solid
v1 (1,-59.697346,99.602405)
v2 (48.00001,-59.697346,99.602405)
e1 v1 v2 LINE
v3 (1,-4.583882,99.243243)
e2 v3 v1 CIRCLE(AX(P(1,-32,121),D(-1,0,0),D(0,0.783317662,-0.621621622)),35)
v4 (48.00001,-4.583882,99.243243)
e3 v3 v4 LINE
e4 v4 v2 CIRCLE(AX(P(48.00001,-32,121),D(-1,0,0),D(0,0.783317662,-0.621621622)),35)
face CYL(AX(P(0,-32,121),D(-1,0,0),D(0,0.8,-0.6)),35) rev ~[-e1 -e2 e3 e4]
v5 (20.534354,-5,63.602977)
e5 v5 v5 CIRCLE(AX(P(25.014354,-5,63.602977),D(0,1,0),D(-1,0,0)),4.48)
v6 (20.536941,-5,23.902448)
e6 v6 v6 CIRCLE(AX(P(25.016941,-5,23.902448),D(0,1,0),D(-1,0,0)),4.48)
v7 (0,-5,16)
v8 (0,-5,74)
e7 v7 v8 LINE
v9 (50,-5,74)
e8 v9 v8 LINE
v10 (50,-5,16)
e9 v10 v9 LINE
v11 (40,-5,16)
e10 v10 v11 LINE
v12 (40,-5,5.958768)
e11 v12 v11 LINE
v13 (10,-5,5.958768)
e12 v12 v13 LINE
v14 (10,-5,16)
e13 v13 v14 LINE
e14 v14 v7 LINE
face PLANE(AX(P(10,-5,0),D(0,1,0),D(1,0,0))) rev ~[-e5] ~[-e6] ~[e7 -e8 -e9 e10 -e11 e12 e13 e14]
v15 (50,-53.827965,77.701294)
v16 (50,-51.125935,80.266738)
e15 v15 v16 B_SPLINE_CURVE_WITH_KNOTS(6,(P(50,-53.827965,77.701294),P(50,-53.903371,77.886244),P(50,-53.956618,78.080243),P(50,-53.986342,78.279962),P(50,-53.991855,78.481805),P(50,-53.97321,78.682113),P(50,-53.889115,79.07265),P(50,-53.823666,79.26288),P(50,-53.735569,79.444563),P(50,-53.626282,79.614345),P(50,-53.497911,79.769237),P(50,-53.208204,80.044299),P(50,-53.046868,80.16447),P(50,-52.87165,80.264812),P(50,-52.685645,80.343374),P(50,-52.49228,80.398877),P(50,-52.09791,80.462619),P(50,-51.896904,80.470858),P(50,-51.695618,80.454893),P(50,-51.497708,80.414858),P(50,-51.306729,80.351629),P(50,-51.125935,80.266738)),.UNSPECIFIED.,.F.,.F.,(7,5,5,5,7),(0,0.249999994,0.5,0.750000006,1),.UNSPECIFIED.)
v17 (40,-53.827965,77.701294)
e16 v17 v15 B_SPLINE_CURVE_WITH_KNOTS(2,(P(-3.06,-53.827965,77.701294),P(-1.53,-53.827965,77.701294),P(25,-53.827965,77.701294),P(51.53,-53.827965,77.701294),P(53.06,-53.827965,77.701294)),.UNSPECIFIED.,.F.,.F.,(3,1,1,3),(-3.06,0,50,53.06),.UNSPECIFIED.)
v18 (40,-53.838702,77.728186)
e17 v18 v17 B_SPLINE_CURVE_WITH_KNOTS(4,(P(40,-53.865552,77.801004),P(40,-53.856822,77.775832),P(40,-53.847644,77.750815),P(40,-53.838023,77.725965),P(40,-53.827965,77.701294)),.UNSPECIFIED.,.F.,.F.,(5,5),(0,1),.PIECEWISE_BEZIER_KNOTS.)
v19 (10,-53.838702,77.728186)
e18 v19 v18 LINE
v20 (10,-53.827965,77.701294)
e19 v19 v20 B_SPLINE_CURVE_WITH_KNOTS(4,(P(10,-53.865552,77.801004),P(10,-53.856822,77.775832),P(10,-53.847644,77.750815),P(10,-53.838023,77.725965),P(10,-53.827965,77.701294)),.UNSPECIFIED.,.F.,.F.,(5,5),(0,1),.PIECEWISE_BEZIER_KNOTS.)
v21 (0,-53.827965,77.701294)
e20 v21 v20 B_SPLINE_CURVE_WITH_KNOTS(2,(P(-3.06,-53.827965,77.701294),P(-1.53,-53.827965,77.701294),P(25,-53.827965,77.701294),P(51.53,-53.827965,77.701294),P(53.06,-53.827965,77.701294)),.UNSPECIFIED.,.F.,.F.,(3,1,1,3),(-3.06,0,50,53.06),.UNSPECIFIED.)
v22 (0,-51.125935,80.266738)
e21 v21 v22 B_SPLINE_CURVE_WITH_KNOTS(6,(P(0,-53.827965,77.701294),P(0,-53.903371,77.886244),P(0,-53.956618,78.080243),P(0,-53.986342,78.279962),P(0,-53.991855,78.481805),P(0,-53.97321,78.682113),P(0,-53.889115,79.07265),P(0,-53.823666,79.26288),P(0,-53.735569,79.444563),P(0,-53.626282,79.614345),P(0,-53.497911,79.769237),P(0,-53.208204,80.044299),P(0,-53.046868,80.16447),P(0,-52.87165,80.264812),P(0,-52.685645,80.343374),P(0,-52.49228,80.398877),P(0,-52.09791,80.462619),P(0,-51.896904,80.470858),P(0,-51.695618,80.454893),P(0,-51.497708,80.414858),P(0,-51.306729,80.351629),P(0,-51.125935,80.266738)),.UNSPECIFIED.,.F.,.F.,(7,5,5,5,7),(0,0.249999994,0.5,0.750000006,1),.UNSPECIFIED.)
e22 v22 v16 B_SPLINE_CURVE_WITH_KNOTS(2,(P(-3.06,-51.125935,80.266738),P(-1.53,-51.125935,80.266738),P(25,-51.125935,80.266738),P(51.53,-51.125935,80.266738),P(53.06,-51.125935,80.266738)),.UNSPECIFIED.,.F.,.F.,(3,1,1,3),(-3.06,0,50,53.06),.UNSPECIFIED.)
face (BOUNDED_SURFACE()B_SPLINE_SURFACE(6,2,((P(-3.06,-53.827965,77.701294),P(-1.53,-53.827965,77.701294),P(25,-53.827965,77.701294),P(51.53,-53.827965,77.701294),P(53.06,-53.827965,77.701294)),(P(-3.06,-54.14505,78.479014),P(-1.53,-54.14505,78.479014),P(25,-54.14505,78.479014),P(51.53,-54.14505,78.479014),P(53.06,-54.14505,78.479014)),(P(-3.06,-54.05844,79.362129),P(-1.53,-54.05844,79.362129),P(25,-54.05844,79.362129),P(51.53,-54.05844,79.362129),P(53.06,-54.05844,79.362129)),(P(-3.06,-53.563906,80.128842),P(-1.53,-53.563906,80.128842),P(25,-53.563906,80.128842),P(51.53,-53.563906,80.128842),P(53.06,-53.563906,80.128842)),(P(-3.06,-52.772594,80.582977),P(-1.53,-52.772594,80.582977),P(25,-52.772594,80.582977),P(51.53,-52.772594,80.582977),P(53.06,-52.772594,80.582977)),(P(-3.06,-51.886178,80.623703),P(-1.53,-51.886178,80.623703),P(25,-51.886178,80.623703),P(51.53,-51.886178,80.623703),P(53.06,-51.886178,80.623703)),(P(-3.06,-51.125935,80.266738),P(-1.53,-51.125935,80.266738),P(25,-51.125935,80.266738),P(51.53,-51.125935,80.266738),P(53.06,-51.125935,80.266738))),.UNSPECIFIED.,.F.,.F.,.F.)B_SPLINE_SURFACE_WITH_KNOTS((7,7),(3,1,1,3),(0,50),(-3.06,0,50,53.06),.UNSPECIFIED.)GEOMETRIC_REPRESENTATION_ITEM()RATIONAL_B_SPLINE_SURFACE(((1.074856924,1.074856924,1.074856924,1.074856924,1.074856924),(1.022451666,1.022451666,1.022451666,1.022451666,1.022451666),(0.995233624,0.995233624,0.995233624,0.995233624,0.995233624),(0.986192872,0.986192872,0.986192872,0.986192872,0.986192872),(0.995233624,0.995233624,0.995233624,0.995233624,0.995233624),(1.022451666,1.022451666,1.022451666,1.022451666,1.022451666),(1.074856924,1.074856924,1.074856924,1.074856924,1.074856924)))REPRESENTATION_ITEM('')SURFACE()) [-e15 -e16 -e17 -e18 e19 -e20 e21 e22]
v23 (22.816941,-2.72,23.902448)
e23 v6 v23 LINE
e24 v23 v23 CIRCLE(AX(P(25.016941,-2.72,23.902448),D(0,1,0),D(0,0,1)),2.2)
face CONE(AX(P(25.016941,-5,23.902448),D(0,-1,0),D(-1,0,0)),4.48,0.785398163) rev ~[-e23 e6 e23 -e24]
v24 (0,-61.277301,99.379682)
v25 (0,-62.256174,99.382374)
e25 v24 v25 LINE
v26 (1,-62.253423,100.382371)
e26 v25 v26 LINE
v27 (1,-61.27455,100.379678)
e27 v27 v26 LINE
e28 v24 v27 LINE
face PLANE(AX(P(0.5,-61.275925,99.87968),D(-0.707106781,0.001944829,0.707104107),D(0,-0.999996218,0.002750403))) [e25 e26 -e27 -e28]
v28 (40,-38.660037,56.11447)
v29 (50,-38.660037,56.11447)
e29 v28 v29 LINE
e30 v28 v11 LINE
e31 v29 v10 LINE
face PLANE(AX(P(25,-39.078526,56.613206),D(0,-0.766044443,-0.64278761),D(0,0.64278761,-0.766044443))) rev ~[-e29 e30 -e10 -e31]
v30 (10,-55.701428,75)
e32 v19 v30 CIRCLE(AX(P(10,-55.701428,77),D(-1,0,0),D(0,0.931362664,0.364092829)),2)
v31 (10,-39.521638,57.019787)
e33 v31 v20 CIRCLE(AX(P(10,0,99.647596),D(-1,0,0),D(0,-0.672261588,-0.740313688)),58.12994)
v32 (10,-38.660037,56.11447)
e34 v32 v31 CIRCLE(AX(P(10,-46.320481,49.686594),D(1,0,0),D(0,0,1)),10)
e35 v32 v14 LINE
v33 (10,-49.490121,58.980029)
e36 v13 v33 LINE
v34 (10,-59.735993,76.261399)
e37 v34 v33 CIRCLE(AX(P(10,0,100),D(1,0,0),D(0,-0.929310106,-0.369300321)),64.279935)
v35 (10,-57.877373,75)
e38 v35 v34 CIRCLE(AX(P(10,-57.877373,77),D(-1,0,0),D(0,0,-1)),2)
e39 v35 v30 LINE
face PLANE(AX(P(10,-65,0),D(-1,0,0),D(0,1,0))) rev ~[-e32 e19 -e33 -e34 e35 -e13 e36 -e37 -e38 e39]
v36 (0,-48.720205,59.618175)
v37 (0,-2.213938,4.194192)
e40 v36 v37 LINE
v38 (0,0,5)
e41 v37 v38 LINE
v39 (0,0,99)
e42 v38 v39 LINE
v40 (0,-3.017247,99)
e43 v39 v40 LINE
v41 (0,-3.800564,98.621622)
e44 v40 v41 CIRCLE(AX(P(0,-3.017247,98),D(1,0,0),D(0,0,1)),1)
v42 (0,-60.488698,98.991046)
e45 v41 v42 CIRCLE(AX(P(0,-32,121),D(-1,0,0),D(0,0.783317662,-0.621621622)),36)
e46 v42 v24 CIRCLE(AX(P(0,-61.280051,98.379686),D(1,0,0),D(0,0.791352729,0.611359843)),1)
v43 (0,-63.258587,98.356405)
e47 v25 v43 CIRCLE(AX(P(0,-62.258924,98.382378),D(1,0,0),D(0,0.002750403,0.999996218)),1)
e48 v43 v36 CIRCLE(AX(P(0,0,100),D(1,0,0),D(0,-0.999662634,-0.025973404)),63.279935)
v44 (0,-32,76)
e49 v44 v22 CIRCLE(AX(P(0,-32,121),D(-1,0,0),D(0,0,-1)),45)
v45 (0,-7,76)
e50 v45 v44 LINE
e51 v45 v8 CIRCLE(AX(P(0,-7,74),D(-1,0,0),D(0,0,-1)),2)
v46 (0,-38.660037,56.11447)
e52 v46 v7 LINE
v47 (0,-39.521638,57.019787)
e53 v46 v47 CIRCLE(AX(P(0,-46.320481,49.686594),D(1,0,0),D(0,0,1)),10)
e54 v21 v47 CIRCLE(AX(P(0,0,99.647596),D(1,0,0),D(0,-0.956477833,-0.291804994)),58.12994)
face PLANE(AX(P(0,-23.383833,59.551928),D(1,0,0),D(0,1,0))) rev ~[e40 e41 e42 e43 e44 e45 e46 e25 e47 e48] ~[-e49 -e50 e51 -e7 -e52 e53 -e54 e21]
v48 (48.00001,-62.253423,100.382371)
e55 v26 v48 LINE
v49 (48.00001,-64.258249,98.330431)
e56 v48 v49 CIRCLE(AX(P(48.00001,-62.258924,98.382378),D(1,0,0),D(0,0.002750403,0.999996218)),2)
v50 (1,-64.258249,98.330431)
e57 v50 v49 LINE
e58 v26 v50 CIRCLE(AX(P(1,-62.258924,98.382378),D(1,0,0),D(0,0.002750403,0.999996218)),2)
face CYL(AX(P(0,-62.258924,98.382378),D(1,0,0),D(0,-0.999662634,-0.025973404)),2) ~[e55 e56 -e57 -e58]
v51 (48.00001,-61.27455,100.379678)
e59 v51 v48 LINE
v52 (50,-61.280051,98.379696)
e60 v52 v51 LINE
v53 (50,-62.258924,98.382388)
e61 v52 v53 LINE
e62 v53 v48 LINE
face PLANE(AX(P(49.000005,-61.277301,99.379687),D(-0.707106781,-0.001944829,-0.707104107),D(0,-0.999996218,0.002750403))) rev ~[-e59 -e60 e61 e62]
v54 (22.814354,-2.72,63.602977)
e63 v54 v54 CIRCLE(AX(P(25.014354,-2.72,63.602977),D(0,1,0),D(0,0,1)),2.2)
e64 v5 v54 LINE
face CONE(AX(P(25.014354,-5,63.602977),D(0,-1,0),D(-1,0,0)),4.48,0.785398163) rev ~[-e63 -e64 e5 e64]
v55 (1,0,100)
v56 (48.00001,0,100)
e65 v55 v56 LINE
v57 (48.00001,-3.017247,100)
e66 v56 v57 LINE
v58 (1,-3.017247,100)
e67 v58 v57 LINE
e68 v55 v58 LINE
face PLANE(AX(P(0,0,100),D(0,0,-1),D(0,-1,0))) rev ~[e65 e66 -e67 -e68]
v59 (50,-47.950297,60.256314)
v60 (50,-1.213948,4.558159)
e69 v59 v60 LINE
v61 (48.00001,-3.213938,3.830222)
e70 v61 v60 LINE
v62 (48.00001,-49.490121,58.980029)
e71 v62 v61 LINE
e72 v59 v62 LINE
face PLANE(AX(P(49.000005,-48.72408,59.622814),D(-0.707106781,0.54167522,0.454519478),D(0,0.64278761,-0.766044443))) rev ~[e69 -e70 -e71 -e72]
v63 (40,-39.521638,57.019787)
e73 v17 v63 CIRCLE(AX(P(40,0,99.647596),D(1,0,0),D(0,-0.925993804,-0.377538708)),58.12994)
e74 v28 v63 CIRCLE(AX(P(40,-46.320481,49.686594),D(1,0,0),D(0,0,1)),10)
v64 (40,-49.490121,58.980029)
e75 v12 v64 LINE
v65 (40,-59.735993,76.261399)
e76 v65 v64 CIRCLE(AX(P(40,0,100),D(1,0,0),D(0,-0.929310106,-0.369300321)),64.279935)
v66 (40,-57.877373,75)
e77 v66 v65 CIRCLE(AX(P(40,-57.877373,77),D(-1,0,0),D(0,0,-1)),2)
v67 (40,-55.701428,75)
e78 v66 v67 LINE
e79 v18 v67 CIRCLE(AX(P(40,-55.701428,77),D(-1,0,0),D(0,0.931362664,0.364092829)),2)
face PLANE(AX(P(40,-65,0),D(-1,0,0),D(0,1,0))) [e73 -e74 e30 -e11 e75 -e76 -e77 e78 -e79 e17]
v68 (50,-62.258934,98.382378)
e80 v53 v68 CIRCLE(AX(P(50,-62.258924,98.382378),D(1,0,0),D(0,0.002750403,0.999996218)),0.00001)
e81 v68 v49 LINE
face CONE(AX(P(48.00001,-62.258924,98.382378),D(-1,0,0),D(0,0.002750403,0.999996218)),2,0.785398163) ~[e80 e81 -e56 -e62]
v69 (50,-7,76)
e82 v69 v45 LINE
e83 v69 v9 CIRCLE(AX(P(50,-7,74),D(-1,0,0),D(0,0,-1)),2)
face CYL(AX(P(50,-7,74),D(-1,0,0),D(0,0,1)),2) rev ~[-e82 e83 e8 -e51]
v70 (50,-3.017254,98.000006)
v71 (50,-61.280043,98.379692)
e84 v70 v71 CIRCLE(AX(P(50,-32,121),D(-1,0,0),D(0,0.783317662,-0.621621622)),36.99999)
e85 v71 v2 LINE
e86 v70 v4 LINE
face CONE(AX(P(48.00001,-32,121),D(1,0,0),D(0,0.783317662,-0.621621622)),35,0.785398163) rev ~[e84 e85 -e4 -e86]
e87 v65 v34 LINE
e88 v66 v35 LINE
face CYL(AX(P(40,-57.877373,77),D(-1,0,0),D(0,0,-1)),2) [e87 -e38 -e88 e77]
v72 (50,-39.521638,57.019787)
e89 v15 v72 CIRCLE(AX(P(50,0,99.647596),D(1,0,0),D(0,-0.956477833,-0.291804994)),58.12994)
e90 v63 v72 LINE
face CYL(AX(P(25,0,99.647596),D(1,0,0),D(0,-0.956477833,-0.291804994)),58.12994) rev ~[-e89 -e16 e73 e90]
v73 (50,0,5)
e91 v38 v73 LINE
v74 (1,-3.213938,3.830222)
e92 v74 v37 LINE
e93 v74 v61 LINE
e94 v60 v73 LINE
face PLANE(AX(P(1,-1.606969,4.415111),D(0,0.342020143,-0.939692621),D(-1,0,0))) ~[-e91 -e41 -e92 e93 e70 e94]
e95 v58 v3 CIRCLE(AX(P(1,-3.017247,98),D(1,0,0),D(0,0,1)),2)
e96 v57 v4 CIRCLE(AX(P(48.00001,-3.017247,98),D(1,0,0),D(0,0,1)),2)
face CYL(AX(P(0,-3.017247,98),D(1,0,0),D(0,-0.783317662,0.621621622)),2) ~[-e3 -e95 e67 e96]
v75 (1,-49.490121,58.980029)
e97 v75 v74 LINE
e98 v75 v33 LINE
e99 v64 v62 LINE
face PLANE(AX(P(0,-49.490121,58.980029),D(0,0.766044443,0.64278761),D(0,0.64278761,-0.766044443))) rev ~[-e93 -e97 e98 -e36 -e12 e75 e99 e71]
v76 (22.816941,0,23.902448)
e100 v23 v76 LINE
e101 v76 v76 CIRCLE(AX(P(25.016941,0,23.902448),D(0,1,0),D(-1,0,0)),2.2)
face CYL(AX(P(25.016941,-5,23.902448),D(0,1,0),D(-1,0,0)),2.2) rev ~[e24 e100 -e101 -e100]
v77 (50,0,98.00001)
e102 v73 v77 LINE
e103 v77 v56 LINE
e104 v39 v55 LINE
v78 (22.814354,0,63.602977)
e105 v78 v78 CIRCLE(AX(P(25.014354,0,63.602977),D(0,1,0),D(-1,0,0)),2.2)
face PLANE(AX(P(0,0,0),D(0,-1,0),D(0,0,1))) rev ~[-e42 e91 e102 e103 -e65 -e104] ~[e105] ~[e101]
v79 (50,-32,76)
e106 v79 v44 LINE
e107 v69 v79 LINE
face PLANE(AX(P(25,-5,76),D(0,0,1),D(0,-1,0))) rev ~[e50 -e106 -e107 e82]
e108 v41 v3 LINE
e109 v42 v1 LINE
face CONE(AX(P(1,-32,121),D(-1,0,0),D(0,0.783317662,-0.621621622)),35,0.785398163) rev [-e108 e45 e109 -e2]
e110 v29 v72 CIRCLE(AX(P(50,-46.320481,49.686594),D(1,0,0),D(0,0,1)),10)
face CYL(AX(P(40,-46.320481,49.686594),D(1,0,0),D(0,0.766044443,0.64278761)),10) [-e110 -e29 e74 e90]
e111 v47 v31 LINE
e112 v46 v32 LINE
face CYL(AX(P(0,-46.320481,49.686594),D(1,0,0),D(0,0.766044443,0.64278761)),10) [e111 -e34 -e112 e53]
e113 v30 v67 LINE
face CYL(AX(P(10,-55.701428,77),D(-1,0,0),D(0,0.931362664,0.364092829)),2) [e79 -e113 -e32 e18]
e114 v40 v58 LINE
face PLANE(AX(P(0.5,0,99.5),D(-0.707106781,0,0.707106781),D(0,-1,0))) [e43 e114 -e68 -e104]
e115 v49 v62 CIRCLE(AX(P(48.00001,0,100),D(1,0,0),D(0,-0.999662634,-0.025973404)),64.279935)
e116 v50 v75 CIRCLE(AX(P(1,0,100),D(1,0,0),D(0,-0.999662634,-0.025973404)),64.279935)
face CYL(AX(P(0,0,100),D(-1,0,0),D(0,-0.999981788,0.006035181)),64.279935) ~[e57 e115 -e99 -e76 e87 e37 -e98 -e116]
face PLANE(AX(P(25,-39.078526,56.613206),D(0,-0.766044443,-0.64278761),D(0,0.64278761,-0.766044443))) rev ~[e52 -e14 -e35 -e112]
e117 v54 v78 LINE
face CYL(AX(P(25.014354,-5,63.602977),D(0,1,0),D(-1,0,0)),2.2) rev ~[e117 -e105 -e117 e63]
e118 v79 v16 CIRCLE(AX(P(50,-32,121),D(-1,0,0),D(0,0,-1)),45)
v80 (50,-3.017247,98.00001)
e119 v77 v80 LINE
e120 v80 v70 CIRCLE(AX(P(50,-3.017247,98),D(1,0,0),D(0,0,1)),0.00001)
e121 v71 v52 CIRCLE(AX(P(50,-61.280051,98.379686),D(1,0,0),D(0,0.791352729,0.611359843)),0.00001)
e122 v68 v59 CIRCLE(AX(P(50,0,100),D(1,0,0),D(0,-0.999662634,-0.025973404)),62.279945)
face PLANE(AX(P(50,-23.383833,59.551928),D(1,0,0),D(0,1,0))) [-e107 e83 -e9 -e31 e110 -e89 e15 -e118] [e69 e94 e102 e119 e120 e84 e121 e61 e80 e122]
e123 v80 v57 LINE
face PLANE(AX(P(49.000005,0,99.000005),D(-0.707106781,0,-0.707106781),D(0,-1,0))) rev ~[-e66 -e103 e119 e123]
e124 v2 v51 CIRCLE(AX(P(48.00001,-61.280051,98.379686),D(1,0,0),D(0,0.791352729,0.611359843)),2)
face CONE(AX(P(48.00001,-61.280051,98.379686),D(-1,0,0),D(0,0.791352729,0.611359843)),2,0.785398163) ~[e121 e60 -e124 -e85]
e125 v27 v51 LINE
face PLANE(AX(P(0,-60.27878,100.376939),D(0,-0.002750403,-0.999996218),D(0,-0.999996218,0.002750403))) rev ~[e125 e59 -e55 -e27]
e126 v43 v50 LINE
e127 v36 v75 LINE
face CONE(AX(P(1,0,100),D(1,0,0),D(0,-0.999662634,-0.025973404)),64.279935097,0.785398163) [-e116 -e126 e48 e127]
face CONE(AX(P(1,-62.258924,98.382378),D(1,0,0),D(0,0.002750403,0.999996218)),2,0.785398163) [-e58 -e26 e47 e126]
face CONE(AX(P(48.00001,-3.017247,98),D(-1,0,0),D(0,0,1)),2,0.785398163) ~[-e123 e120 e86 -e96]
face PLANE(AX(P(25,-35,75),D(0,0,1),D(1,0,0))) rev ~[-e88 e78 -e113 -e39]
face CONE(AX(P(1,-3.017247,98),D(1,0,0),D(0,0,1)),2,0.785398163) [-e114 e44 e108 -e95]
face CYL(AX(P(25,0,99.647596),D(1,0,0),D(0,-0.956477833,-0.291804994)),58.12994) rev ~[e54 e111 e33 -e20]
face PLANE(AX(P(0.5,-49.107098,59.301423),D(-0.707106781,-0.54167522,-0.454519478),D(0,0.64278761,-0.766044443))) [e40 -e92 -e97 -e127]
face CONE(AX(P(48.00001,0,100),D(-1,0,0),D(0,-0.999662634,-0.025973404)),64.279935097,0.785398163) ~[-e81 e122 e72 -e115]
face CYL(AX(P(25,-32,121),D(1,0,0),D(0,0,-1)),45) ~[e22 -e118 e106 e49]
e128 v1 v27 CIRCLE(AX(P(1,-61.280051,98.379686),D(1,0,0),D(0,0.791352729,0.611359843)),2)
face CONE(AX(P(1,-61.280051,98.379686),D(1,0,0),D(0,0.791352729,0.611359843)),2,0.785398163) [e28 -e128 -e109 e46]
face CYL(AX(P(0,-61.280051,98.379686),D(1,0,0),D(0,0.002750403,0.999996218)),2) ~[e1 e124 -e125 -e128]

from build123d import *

# Parameters (mm, degrees)
F1_DEPTH       = 50
F4_DEPTH       = 25
F5_W           = 30
F5_H           = 60
F6_DEPTH       = 75
F8_D           = 4.4
F8_CSINK_D     = 8.96
F8_CSINK_ANGLE = 90
F9_R           = 2
F10_T1_DEPTH   = 30
F11_R          = 10
F12_SIZE       = 1.99999
F13_SIZE       = 1
F14_SIZE       = 5


# Not quite as in the source:
# - a fillet or chamfer that OpenCascade refuses, or shapes differently, is made with other operations: its cross-section is extruded or revolved along the edge and cut away or added
# - a fillet or chamfer is up to 0.001 mm smaller than in the source, because OpenCascade refuses the exact size


with BuildPart() as f1:
    # F0 (on Right) → F1 (new body)
    with BuildSketch(Plane.YZ):
        with BuildLine():
            Line((-49.4901207083, 58.9800291521), (0, 0))
            Line((0, 0), (0, 100))
            Line((0, 100), (-4, 100))
            ThreePointArc((-4, 100), (-32.2344149115, 86.0007850138), (-60.2787795686, 100.3769394581))
            Line((-60.2787795686, 100.3769394581), (-64.2787644391, 100.3879410703))
            ThreePointArc((-64.2787644391, 100.3879410703), (-60.5350609092, 78.3801837008), (-49.4901207083, 58.9800291521))
        make_face()
    extrude(amount=F1_DEPTH)

    # F3 (on offset) → F4 (cut, symmetric)
    with BuildSketch(Plane.YZ.offset(25)):
        with BuildLine():
            ThreePointArc((-32, 76), (-44.2642678148, 77.703490499), (-55.5999994652, 82.684989557))
            ThreePointArc((-55.5999994652, 82.684989557), (-49.1013266214, 68.5324924594), (-39.0785260857, 56.6132058929))
            Line((-39.0785260857, 56.6132058929), (-5, 16))
            Line((-5, 16), (-5, 76))
            Line((-5, 76), (-32, 76))
        make_face()
    extrude(amount=F4_DEPTH, both=True, mode=Mode.SUBTRACT)

    # F5 (on Top) → F6 (cut)
    with BuildSketch(Plane.XY):
        with Locations((25, -35)):
            Rectangle(F5_W, F5_H)
    extrude(amount=F6_DEPTH, mode=Mode.SUBTRACT)

    # F8 (through all)
    with Locations(Plane.XZ.offset(5)):
        with Locations((25.014353916, 63.602976501), (25.0169411302, 23.9024478942)):
            CounterSinkHole(F8_D / 2, F8_CSINK_D / 2, counter_sink_angle=F8_CSINK_ANGLE)

    # F9
    f9_edges = [f1.edges().sort_by_distance(p)[0] for p in [
        (25, -64.278764, 100.387941),
        (25, -60.27878, 100.376939),
        (25, -4, 100),
        (25, -59.21917, 75),
        (25, -55.599999, 82.68499),
        (25, -5, 76),
    ]]
    fillet(f9_edges, radius=F9_R)

    # F10: fillet of radius 2 on 1 edges, made by hand

    # F10_s2 → F10_t1 (cut)
    with BuildSketch(Plane.YZ.offset(10)):
        with BuildLine():
            ThreePointArc((-53.8387023607, 77.7281856581), (-54.0497056605, 75.8722525363), (-55.7014276886, 75))
            Line((-55.7014276886, 75), (-55.7014276886, 74.8))
            Line((-55.7014276886, 74.8), (-52.6458541761, 74.8))
            Line((-52.6458541761, 74.8), (-52.4647225466, 75.0848017263))
            ThreePointArc((-52.4647225466, 75.0848017263), (-53.6427658792, 77.7768016426), (-53.6524298279, 77.8010042239))
            Line((-53.6524298279, 77.8010042239), (-53.8387023607, 77.7281856581))
        make_face()
    extrude(amount=F10_T1_DEPTH, mode=Mode.SUBTRACT)

    # F11
    f11_edges = [f1.edges().sort_by_distance(p)[0] for p in [
        (45, -39.078526, 56.613206),
        (5, -39.078526, 56.613206),
    ]]
    fillet(f11_edges, radius=F11_R)

    # F12 (size 2 in the source; OpenCascade refuses exactly that, so slightly less here)
    f12_edges = [f1.edges().sort_by_distance(p)[0] for p in [
        (50, -32.228082, 86.000743),
        (50, -60.18128, 77.414084),
        (50, -63.689465, 99.780073),
        (50, -61.763987, 100.381024),
        (50, -60.395948, 100.173665),
        (50, -3.887164, 99.800901),
        (50, -1.508623, 100),
        (50, -24.74506, 29.490015),
    ]]
    chamfer(f12_edges, length=F12_SIZE)

    # F13
    f13_edges = [f1.edges().sort_by_distance(p)[0] for p in [
        (0, -1.508623, 100),
        (0, -3.887164, 99.800901),
        (0, -32.228082, 86.000743),
        (0, -60.395948, 100.173665),
        (0, -61.763987, 100.381024),
        (0, -63.689465, 99.780073),
        (0, -60.18128, 77.414084),
        (0, -24.74506, 29.490015),
    ]]
    chamfer(f13_edges, length=F13_SIZE)

    # F14
    f14_edges = [f1.edges().sort_by_distance(p)[0] for p in [
        (24.500005, 0, 0),
    ]]
    chamfer(f14_edges, length=F14_SIZE)


solid = f1.part
